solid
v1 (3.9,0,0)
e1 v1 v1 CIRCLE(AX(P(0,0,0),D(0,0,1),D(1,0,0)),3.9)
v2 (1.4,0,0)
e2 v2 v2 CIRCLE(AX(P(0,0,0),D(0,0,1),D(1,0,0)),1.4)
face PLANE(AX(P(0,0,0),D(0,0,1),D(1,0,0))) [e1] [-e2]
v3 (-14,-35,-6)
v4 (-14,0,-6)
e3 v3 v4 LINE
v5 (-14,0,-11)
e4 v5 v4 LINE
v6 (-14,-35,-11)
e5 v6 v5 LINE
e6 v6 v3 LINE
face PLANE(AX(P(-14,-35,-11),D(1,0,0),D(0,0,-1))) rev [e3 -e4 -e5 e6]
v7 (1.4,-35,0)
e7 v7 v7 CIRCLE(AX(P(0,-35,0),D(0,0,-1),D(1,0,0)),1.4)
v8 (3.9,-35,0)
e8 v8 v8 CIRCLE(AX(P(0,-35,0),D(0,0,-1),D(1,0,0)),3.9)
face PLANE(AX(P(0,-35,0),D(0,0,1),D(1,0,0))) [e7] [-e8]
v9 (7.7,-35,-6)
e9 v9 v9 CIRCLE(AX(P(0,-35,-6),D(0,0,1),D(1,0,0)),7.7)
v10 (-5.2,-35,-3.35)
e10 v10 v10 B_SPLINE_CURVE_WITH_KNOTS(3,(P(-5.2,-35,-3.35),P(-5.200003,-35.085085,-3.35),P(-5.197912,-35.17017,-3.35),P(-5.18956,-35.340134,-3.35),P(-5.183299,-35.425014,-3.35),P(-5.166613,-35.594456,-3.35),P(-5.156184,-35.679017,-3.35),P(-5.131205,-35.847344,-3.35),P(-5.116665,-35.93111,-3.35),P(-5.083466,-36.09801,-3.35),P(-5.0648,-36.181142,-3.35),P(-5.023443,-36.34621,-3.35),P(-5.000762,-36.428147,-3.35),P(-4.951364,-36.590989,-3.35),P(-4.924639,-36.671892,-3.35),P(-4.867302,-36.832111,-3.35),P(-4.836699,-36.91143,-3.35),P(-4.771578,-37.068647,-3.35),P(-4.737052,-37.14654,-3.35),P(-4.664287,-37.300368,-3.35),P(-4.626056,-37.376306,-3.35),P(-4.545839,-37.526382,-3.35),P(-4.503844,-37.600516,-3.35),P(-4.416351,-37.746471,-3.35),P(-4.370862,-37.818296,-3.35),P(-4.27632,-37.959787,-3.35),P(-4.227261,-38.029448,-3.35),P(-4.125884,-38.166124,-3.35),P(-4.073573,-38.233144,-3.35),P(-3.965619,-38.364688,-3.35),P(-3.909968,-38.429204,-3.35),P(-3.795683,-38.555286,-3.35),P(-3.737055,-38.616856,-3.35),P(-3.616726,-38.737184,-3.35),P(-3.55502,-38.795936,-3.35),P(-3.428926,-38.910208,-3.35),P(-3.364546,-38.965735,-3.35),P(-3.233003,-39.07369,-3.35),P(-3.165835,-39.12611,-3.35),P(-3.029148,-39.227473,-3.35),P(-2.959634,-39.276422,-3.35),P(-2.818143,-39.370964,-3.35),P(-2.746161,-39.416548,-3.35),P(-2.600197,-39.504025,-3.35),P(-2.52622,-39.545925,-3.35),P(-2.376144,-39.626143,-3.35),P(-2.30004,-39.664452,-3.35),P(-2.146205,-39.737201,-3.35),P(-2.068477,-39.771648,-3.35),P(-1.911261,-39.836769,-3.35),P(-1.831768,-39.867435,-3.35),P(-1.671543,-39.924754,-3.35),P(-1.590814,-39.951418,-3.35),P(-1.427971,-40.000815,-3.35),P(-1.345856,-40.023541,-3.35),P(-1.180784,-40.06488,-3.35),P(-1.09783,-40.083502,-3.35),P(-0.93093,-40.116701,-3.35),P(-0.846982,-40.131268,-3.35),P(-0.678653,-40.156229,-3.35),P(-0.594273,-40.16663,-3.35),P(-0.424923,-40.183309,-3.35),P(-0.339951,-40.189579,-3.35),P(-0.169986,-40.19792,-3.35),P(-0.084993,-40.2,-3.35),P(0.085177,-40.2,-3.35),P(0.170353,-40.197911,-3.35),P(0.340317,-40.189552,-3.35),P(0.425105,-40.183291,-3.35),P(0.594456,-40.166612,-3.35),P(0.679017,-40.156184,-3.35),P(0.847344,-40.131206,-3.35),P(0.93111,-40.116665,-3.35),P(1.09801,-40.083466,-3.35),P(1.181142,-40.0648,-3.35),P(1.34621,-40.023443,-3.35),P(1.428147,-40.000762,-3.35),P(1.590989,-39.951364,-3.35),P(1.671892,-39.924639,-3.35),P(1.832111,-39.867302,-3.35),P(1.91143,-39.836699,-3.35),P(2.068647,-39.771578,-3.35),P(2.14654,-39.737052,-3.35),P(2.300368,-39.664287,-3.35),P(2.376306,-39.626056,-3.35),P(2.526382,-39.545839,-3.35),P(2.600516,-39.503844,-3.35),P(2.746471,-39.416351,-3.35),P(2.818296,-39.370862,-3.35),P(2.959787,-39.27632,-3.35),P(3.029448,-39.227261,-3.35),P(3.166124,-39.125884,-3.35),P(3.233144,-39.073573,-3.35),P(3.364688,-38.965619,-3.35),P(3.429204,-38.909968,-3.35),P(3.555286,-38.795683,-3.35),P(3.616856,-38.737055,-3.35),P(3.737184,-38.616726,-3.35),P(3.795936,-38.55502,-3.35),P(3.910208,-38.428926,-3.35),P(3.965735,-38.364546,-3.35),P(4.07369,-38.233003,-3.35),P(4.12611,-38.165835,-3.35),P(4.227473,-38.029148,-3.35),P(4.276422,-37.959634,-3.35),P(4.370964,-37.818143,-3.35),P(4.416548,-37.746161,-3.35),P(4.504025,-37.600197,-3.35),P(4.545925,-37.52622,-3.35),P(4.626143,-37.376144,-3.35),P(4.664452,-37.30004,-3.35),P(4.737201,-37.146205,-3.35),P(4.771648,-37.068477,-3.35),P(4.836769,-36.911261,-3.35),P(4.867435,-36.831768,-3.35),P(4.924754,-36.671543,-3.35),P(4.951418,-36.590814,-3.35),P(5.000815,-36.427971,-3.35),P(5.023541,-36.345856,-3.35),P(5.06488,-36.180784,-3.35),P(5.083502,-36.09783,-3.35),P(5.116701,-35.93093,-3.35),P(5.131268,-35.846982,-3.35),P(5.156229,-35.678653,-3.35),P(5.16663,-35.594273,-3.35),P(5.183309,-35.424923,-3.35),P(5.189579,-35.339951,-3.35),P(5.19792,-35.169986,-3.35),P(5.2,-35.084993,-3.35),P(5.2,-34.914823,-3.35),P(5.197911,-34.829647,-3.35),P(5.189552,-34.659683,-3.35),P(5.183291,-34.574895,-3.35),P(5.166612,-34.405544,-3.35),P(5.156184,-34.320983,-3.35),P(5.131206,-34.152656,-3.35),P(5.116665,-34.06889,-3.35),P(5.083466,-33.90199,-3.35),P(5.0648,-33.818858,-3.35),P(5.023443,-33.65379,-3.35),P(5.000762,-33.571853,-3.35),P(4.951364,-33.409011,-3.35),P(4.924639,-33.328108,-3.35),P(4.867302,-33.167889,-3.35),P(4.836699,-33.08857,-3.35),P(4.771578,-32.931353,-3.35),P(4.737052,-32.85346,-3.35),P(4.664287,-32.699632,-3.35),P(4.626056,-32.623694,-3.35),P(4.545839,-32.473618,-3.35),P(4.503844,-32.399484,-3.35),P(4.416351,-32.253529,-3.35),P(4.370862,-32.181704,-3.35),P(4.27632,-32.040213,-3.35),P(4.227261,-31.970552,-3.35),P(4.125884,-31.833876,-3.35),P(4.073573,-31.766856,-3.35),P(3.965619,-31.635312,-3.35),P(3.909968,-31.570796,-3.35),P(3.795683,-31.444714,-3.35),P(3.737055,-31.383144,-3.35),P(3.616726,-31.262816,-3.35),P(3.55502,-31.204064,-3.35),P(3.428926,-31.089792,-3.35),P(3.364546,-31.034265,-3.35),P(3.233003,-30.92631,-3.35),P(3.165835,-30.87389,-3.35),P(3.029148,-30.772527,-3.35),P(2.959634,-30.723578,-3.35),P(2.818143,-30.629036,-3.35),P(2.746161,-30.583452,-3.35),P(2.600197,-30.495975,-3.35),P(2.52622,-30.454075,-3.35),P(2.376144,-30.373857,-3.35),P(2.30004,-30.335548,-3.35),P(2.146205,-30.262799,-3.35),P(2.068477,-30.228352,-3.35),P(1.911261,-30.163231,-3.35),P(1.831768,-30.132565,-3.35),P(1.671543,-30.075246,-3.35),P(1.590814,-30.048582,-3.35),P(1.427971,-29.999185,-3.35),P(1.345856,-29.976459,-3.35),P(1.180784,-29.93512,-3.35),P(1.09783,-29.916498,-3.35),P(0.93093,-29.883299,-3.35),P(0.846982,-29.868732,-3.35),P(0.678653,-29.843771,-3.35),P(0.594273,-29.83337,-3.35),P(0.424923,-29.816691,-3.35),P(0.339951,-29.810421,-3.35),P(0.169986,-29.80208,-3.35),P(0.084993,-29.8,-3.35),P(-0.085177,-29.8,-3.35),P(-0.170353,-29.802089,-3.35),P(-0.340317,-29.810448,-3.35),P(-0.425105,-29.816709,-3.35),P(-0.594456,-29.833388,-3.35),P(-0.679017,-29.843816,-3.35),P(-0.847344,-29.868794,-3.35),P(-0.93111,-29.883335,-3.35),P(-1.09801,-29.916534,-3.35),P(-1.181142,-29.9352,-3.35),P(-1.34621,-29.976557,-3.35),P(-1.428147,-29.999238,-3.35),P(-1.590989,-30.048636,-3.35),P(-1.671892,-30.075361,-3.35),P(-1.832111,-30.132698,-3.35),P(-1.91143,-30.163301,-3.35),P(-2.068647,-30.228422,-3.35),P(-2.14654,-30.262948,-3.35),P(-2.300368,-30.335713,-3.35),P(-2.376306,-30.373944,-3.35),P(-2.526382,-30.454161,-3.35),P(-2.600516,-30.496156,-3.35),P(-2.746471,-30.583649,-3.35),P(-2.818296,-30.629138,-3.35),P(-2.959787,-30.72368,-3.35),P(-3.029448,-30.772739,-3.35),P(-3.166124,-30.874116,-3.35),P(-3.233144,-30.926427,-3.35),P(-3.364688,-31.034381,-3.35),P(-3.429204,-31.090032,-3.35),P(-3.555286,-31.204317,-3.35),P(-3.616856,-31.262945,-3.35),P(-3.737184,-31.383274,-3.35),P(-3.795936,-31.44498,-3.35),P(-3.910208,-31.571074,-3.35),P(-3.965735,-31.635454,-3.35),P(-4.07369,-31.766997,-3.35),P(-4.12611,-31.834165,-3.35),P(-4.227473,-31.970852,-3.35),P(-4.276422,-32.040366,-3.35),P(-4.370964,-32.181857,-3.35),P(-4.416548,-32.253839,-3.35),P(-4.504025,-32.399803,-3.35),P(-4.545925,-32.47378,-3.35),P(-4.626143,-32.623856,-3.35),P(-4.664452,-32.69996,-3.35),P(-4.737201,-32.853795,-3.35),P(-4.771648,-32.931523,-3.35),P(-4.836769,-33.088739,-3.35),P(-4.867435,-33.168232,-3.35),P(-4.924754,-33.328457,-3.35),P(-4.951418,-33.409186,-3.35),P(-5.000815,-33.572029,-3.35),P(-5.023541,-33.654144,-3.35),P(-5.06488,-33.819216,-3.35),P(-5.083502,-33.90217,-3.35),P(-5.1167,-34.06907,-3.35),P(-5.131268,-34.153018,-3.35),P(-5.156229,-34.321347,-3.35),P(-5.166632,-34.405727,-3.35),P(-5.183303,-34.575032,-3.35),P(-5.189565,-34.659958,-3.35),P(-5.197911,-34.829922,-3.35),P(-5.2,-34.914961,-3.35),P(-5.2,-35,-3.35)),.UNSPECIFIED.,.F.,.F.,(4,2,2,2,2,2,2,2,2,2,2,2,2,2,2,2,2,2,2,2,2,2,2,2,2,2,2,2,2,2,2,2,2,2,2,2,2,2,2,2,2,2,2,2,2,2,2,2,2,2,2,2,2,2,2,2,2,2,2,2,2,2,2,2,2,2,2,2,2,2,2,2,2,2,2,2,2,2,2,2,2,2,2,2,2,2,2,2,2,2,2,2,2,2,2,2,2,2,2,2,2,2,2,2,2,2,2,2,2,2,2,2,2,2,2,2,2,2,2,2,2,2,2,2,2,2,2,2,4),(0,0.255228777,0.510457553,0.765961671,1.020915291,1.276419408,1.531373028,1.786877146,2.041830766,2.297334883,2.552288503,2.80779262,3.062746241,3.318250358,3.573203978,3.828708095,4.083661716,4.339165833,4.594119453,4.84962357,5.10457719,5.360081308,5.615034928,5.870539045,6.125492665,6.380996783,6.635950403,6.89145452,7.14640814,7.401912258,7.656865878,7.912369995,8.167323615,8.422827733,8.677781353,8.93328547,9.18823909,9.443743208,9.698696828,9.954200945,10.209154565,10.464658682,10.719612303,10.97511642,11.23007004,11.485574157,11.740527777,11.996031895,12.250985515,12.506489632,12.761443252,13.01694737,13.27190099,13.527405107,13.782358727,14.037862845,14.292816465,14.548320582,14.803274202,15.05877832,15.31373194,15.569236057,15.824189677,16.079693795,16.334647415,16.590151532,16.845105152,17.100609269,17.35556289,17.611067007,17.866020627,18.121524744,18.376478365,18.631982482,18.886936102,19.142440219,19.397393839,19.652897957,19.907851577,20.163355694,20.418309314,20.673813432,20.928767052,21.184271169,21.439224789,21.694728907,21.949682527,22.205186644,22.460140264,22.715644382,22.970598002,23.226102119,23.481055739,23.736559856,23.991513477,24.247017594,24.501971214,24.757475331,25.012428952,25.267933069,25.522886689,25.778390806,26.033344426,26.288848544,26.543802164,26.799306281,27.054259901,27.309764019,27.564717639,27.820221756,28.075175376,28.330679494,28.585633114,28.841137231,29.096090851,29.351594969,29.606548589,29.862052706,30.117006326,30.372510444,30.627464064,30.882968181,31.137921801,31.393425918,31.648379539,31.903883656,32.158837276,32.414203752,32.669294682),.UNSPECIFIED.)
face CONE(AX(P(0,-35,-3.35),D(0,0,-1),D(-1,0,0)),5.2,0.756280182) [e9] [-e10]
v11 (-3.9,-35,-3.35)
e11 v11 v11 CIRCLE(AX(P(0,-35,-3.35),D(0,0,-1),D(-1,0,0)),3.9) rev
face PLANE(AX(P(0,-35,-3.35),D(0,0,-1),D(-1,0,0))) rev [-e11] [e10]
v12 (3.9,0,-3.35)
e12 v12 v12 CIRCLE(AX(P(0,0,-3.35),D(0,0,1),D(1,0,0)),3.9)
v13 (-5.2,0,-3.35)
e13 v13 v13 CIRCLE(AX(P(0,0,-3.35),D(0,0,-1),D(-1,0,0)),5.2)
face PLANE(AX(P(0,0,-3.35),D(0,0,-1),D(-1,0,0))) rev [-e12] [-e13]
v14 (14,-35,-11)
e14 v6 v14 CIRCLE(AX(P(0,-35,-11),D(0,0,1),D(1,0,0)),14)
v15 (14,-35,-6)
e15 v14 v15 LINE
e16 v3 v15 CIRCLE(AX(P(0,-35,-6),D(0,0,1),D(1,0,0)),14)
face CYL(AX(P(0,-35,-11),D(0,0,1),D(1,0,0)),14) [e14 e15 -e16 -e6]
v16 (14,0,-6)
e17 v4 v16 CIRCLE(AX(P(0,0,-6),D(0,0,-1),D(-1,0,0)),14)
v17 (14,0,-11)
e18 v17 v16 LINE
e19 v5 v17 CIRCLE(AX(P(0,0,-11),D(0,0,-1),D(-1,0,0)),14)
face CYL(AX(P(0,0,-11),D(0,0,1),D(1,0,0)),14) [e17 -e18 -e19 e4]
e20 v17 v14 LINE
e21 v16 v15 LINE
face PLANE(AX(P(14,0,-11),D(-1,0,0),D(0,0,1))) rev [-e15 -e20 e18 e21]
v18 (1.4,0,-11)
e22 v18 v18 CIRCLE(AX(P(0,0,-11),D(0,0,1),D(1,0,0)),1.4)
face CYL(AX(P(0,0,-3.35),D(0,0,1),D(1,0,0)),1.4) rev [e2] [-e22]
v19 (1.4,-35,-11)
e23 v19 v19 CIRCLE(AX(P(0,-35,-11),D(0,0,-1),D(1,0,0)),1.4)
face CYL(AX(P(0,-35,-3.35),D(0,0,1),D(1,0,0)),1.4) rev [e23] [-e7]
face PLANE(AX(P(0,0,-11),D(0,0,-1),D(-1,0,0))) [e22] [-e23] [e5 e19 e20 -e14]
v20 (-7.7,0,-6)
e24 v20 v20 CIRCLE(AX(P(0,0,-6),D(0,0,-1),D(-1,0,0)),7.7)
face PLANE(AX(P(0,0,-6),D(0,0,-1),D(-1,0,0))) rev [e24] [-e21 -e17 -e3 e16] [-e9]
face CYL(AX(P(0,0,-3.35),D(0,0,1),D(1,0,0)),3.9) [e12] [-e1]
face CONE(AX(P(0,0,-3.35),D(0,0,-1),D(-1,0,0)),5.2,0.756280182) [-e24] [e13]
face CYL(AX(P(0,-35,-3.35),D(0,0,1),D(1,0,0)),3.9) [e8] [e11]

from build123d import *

# Parameters (mm, degrees)
SKETCH_1_R           = 3.9
SKETCH_1_R_2         = 1.4
EXTRUDE_1_DEPTH      = 3.35
SKETCH_2_R           = 5.2
SKETCH_3_R           = 7.7
EXTRUDE_2_DEPTH      = 5
MIRROR_START         = -3.35
MIRROR_6_OUTLINE_R   = 3.9
MIRROR_6_OUTLINE_R_2 = 1.4
MIRROR_6_DEPTH       = 3.35
SKETCH_1_3_R         = 1.4
CUT_EXTRUDE_1_DEPTH  = 11


# Read off the part's stored shape, not the designer's step: 镜向6
with BuildPart() as part:
    # 草图1 → 凸台-拉伸1 (new body)
    with BuildSketch(Plane.XY):
        Circle(SKETCH_1_R)
        Circle(SKETCH_1_R_2, mode=Mode.SUBTRACT)
    extrude(amount=-EXTRUDE_1_DEPTH)

    # 草图2 → 放样1 section 0
    with BuildSketch(Plane(origin=(0, 0, -3.35), x_dir=(-1, 0, 0), z_dir=(0, 0, -1))):
        Circle(SKETCH_2_R)
    # 草图3 → 放样1 section 1
    with BuildSketch(Plane(origin=(0, 0, -6), x_dir=(-1, 0, 0), z_dir=(0, 0, -1))):
        Circle(SKETCH_3_R)
    loft_1 = loft()

    # 草图5 → 凸台-拉伸2 (add)
    with BuildSketch(Plane(origin=(0, 0, -6), x_dir=(-1, 0, 0), z_dir=(0, 0, -1))):
        with BuildLine():
            Line((-14, 0), (-14, -35))
            ThreePointArc((-14, -35), (0, -49), (14, -35))
            Line((14, -35), (14, 0))
            ThreePointArc((14, 0), (0, 14), (-14, 0))
        make_face()
    extrude(amount=EXTRUDE_2_DEPTH)

    # 镜向5: 放样1 across plane
    add(loft_1.mirror(Plane(origin=(0, -17.5, 0), x_dir=(0, 0, 1), z_dir=(0, -1, 0))))

    # 镜向6 outline → 镜向6 (add)
    with BuildSketch(Plane.XY.offset(MIRROR_START)):
        with Locations((0, -35)):
            Circle(MIRROR_6_OUTLINE_R)
        with Locations((0, -35)):
            Circle(MIRROR_6_OUTLINE_R_2, mode=Mode.SUBTRACT)
    extrude(amount=MIRROR_6_DEPTH)

    # 草图1<3> → 切除-拉伸1 (cut)
    with BuildSketch(Plane.XY):
        Circle(SKETCH_1_3_R)
    cut_extrude_1 = extrude(amount=-CUT_EXTRUDE_1_DEPTH, mode=Mode.SUBTRACT)

    # 镜向7: 切除-拉伸1 across plane
    add(cut_extrude_1.mirror(Plane(origin=(0, -17.5, 0), x_dir=(0, 0, 1), z_dir=(0, -1, 0))), mode=Mode.SUBTRACT)


solid = part.part
